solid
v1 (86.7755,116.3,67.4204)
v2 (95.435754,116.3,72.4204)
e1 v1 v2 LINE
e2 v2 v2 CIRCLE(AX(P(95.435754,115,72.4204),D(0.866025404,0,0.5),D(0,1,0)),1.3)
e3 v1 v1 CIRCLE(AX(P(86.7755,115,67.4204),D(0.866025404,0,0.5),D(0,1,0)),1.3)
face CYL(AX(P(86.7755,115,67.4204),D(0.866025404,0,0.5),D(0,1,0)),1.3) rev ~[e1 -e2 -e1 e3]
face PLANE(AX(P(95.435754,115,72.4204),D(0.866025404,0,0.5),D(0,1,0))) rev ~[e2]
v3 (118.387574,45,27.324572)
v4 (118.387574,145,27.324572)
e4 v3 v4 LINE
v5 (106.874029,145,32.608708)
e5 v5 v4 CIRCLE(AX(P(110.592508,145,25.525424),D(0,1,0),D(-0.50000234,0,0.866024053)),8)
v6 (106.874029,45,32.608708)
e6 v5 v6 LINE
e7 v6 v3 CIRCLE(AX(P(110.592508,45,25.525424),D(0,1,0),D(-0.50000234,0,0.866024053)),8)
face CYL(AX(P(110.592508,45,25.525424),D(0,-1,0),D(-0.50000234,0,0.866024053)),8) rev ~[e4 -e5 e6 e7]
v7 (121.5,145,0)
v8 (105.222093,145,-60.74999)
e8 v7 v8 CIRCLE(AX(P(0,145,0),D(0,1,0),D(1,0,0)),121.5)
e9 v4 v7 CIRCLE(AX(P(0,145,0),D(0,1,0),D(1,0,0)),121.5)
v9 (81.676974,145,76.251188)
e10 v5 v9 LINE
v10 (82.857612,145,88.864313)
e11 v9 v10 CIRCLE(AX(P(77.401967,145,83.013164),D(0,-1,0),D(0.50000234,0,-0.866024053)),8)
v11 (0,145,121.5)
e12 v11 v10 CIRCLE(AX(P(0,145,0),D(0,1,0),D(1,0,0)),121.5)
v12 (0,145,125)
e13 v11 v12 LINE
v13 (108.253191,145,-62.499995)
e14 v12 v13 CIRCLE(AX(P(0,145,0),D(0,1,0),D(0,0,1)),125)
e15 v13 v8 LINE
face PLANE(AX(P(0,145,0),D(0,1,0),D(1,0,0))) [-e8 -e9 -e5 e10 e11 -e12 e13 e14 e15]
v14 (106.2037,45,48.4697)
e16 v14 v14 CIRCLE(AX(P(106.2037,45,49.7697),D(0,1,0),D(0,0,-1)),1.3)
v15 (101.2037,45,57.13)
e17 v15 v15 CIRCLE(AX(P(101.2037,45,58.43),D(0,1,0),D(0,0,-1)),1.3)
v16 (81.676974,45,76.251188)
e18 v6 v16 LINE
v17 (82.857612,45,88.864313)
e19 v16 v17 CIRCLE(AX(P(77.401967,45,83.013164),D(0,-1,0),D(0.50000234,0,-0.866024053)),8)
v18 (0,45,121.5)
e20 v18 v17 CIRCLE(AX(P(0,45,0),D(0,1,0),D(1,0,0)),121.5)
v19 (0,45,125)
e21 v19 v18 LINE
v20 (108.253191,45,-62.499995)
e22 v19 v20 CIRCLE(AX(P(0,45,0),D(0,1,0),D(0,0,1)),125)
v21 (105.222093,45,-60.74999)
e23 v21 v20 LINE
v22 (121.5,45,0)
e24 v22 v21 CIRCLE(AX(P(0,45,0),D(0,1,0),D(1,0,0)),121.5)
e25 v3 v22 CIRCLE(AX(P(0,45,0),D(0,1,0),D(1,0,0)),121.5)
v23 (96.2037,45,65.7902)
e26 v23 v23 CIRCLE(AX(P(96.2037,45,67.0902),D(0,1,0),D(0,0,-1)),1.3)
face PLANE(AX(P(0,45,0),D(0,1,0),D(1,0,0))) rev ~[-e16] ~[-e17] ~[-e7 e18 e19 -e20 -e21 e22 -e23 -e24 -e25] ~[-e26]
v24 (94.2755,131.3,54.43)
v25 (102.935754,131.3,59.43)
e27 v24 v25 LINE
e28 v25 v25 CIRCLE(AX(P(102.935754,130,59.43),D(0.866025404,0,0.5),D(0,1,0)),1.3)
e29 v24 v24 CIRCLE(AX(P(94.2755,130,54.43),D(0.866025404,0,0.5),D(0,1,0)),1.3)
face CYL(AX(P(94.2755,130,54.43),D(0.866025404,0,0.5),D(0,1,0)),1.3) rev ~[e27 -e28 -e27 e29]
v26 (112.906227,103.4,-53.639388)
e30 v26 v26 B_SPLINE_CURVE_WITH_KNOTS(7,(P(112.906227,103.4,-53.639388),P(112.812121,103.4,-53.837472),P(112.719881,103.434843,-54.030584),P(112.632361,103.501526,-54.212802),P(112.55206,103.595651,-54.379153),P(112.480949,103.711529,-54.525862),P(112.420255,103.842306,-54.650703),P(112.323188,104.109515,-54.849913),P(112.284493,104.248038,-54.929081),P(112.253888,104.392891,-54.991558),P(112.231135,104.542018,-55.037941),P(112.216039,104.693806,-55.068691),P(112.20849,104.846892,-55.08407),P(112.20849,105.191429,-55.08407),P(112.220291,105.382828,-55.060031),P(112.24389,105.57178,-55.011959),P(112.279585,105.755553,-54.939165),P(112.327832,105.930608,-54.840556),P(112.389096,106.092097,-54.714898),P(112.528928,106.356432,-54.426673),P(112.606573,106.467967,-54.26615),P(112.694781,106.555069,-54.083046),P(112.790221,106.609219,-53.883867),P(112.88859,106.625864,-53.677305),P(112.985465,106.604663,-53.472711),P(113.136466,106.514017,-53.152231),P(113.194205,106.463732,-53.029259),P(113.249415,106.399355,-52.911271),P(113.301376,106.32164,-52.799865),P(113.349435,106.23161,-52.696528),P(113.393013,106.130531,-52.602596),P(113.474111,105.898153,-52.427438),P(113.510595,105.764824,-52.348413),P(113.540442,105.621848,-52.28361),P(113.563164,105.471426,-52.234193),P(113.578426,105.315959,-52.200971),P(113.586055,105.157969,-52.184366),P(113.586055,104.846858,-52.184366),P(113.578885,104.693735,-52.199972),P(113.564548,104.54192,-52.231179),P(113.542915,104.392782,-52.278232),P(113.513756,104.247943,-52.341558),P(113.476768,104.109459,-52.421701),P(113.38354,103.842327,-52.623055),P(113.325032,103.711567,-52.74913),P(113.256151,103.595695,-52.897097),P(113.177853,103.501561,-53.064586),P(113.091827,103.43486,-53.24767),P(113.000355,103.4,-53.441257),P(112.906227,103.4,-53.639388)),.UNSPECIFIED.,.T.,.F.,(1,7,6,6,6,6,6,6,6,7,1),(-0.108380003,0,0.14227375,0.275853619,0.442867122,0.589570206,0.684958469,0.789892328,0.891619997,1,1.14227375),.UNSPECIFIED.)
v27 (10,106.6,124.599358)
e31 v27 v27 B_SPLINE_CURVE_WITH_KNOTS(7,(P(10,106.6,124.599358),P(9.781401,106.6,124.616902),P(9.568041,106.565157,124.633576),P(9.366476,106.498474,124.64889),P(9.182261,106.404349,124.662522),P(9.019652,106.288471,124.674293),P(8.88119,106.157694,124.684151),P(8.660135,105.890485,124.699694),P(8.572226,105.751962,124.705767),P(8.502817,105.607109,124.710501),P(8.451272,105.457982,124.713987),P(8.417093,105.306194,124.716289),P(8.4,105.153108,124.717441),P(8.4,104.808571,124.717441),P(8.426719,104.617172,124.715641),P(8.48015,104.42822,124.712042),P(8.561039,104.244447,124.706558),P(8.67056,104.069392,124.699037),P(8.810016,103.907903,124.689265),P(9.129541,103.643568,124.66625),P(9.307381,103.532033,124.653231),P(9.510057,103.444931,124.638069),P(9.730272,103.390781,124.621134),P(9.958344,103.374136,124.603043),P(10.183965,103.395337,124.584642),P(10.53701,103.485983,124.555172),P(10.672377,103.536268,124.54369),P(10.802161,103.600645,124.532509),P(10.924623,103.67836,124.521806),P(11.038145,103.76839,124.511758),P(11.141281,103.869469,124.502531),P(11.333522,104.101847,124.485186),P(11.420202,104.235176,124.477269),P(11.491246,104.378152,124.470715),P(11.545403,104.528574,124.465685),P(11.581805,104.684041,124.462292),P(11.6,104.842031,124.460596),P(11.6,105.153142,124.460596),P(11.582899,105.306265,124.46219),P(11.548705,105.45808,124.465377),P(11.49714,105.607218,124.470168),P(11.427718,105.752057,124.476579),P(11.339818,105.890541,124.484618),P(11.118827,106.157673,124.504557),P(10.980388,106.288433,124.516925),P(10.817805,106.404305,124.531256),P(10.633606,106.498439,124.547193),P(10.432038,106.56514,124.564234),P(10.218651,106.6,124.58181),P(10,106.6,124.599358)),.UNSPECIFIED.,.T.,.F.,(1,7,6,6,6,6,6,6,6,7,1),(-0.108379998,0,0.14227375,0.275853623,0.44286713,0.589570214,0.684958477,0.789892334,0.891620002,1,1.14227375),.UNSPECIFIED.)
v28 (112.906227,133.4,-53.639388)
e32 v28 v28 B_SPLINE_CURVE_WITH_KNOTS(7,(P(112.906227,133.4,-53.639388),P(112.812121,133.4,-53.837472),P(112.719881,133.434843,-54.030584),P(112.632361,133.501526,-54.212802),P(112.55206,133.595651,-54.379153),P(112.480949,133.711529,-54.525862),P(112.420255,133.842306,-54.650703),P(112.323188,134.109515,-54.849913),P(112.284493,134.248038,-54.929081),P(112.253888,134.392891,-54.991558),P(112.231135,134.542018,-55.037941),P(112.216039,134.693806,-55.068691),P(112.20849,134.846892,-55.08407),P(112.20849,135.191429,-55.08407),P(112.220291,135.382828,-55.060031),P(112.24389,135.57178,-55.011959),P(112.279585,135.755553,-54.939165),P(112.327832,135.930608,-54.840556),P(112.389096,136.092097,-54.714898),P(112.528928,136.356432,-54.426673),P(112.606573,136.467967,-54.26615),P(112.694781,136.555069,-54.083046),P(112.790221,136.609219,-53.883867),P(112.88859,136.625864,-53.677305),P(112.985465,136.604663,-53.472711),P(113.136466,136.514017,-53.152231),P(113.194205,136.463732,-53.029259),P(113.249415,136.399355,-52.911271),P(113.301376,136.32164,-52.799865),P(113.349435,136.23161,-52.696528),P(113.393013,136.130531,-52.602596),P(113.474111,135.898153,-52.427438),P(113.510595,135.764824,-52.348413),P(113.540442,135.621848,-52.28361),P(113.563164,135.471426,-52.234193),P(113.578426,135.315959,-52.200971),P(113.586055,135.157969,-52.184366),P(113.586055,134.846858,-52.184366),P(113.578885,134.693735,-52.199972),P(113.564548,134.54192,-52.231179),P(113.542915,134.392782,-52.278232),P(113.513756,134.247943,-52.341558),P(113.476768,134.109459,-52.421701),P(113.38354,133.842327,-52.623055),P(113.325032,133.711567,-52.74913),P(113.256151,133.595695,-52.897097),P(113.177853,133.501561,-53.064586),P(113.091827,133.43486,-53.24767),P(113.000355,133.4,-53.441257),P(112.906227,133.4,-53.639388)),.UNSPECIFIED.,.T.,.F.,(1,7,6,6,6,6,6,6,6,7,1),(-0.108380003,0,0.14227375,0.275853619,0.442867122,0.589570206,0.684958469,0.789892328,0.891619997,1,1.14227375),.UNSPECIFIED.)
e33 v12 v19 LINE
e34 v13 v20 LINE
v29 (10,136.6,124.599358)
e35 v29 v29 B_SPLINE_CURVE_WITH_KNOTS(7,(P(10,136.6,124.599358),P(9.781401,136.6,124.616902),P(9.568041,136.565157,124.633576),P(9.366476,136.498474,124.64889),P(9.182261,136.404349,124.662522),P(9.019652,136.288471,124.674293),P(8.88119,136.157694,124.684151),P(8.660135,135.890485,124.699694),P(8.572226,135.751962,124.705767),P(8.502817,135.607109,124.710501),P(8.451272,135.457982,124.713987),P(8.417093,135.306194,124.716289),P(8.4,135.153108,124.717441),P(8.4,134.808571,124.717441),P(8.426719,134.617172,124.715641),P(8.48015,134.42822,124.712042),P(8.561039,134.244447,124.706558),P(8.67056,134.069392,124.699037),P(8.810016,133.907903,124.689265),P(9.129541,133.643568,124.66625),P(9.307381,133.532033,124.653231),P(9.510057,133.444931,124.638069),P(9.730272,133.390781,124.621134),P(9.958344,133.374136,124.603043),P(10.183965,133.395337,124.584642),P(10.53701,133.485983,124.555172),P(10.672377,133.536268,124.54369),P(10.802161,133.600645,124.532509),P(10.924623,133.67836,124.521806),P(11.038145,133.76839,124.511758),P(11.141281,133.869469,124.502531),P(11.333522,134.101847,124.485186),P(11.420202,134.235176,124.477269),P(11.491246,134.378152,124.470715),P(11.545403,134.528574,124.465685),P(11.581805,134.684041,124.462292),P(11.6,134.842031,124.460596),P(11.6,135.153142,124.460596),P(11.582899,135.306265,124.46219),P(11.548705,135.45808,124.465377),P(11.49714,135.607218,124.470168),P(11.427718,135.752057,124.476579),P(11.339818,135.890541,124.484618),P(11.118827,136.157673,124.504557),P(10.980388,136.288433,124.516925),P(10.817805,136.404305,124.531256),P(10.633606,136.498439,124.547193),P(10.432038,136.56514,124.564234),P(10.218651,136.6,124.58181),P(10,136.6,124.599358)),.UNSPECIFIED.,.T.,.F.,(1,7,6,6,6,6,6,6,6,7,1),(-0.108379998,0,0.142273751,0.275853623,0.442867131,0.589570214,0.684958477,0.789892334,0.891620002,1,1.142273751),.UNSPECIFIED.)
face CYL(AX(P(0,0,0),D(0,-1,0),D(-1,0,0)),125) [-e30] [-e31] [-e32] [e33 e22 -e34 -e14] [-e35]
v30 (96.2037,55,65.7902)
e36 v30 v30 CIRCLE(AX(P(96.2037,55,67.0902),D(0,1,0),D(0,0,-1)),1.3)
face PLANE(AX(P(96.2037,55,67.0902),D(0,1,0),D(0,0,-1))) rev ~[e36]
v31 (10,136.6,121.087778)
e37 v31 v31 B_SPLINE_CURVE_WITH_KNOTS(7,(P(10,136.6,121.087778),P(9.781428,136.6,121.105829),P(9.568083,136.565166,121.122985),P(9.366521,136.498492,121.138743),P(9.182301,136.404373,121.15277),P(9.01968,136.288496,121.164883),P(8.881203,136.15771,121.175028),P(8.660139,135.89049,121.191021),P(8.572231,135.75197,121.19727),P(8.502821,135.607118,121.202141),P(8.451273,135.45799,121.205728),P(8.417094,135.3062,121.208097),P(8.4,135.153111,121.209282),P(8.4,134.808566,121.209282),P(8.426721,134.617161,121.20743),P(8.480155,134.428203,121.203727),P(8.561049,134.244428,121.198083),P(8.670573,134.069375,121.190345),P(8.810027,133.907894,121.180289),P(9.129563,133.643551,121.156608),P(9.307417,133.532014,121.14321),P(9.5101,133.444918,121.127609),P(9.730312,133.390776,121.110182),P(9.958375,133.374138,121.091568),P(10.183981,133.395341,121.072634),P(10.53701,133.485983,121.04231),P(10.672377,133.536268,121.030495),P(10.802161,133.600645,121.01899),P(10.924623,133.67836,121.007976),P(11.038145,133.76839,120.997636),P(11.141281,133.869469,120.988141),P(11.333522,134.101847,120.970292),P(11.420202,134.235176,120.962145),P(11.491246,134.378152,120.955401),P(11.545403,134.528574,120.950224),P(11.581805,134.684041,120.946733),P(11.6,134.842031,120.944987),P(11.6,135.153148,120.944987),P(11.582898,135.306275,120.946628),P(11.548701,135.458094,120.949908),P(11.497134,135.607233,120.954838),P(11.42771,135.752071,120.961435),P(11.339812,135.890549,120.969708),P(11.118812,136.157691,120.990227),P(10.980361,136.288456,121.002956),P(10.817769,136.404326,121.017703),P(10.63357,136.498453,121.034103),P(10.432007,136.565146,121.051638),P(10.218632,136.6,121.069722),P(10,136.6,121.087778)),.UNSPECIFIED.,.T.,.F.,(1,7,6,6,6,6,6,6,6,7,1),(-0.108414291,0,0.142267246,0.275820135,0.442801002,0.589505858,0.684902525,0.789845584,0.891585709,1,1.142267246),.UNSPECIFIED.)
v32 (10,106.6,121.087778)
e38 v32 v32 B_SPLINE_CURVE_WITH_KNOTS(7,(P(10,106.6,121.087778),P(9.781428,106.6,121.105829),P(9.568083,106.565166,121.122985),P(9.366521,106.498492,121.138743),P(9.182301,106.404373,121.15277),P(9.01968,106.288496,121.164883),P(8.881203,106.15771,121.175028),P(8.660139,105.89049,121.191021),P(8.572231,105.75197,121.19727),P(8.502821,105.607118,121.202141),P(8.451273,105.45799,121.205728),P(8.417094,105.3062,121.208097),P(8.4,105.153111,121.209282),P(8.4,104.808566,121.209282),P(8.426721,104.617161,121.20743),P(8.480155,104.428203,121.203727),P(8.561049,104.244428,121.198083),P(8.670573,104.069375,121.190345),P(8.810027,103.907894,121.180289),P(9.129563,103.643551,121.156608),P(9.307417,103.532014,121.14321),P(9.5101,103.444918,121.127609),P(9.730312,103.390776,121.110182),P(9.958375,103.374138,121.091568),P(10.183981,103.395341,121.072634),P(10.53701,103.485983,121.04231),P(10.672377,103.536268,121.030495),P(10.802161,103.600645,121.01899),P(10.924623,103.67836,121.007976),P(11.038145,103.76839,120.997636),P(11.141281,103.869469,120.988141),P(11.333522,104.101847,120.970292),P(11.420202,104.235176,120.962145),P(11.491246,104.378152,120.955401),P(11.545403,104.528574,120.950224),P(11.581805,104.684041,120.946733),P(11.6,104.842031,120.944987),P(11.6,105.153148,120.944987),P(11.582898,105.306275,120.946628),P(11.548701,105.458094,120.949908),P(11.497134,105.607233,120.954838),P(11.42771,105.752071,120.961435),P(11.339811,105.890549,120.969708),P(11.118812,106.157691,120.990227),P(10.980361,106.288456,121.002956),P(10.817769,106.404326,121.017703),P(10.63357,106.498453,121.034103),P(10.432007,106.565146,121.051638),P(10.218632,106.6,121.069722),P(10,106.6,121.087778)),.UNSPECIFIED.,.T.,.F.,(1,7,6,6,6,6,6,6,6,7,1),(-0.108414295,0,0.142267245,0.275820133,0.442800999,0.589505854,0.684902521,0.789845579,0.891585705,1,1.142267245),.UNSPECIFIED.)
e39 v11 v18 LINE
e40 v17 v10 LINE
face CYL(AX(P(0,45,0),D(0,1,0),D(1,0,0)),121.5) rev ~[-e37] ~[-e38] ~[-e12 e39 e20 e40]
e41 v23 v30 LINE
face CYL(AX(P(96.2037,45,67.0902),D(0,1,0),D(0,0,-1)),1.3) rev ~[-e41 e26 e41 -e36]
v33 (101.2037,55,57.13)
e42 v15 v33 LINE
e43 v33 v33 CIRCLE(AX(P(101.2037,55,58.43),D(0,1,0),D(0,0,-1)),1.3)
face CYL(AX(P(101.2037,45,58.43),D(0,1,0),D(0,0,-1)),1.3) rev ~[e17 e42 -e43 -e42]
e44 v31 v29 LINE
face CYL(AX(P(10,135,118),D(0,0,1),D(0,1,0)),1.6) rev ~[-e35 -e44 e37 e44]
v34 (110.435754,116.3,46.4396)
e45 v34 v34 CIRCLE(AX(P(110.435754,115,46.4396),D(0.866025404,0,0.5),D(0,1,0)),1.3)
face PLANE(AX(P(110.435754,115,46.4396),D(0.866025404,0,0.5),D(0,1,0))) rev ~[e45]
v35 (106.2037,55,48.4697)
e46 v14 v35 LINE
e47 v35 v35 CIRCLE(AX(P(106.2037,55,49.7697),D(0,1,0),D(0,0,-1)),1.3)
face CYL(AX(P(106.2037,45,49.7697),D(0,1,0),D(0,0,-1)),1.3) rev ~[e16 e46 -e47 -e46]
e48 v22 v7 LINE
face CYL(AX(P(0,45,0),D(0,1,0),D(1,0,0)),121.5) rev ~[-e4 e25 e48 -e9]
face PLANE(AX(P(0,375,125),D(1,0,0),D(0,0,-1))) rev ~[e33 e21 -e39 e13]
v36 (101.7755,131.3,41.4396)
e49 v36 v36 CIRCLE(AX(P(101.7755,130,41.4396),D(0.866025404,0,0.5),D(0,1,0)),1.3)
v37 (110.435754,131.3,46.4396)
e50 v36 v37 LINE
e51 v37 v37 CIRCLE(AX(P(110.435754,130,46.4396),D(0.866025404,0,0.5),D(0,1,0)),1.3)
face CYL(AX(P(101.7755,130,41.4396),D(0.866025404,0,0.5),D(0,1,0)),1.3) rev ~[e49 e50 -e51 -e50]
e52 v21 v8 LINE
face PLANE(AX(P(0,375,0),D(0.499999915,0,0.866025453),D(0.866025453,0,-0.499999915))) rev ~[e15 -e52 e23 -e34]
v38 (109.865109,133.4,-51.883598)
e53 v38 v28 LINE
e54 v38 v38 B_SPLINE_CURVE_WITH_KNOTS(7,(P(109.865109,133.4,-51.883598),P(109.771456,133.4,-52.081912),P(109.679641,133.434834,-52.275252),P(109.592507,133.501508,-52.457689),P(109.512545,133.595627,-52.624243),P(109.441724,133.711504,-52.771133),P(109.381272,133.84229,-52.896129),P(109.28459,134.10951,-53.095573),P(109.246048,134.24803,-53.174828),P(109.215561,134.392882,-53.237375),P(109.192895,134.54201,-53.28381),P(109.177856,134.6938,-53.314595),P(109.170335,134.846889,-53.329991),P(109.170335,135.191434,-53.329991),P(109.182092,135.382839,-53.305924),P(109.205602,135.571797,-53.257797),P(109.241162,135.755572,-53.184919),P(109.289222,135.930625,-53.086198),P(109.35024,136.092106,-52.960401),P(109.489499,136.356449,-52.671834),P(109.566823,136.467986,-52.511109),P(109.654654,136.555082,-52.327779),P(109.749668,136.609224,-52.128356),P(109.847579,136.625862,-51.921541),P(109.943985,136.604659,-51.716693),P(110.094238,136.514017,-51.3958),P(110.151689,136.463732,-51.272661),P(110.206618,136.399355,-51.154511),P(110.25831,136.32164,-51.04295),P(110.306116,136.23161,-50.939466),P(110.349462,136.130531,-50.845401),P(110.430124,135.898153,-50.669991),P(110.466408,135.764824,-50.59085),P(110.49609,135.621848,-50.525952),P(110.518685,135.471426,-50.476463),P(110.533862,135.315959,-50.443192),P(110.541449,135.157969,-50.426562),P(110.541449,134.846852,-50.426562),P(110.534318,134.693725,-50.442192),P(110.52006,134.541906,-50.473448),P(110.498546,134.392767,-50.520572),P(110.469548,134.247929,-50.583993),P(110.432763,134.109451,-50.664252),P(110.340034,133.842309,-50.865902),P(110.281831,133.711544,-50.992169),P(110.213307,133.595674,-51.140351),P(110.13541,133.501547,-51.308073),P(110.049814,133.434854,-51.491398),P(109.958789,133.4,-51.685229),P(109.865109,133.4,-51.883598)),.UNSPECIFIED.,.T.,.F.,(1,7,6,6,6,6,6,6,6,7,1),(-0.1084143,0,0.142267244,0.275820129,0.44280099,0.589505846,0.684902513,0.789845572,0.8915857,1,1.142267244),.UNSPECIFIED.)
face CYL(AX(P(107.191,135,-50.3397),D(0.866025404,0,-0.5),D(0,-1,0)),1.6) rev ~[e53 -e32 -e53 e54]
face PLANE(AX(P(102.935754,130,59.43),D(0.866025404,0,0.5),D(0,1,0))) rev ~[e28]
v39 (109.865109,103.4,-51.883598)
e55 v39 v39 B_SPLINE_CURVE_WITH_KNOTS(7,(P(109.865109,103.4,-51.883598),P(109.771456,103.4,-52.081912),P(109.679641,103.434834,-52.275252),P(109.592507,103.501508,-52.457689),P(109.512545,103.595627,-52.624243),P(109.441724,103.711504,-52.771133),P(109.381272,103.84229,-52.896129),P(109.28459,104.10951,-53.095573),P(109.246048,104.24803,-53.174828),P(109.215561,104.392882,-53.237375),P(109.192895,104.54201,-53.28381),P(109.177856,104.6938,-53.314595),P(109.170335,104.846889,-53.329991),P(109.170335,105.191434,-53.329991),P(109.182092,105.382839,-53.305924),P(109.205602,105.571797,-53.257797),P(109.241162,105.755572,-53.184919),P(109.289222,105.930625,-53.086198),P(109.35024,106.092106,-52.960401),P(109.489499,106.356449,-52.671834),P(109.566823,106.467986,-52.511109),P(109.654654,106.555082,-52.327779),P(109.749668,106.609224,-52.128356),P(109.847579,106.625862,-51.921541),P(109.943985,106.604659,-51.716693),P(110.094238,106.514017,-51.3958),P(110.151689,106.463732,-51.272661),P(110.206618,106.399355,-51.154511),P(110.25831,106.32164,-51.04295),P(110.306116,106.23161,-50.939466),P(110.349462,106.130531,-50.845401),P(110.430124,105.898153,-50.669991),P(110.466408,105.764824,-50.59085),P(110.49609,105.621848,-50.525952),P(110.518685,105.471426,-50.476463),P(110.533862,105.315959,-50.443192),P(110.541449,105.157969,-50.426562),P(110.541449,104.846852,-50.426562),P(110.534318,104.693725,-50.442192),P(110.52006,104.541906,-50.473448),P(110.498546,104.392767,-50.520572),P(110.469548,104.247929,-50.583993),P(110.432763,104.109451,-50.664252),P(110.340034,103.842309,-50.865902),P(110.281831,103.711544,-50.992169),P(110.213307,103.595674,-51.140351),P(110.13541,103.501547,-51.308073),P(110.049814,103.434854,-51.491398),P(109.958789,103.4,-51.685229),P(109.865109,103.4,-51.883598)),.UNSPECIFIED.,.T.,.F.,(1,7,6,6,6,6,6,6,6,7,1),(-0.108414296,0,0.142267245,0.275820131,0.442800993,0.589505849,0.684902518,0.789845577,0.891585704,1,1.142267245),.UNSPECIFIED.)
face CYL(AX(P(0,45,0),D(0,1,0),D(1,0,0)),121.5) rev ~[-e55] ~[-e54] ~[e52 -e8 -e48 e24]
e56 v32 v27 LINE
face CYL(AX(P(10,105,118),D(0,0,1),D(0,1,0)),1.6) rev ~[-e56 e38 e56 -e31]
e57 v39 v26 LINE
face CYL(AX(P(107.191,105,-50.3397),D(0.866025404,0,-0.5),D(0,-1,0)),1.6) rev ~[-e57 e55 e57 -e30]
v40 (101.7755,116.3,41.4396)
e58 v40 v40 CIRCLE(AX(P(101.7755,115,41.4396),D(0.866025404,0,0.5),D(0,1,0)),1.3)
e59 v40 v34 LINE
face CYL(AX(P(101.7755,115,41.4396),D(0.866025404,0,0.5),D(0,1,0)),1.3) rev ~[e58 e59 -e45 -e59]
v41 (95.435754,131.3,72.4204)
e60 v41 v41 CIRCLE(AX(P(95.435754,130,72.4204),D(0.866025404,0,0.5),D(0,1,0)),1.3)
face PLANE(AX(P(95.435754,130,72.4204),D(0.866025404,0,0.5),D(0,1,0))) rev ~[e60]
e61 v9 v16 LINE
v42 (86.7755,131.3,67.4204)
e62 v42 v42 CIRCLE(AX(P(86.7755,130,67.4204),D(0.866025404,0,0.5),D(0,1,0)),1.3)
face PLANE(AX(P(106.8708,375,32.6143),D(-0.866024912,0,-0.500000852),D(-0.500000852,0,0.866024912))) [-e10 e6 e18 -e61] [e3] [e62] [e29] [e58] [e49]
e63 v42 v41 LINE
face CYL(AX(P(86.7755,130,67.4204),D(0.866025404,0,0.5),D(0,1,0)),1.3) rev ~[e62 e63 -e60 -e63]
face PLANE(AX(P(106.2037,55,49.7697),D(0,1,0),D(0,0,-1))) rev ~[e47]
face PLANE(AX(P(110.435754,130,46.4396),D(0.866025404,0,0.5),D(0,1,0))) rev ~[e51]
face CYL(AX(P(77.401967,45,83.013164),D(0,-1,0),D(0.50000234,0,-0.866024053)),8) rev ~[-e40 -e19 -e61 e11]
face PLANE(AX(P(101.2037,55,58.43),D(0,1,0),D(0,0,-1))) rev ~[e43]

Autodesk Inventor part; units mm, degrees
ref_plane "YZ Plane" through (0, 0, 0) normal (1, 0, 0) x (0, 1, 0)
ref_plane "XZ Plane" through (0, 0, 0) normal (0, 1, 0) x (-1, 0, 0)
ref_plane "XY Plane" through (0, 0, 0) normal (0, 0, 1) x (1, 0, 0)
sketch "スケッチ1" plane through (0, 0, 0) normal (0, 1, 0) x (-1, 0, 0)
  circle A0 centre (0, 0) radius 125
  dimension "d0" = 250
extrude "押し出し1" add sketch "スケッチ1" along normal blind 375
sketch "スケッチ2" plane through (0, 0, 0) normal (0, -1, 0) x (1, 0, 0)
  circle A0 centre (0, 0) radius 125
extrude "押し出し2" cut sketch "スケッチ2" against normal blind 40
sketch "スケッチ3" plane through (0, 40, 0) normal (0, -1, 0) x (1, 0, 0)
  circle A0 centre (0, 0) radius 125 projected
  point P0 (0, 100)
  point P1 (-86.6025, -50)
  point P2 (86.6025, -50)
  dimension "d5" = 100
  dimension "d8" = 360
hole "穴1" at (0, 40, 100) at (-86.6025, 40, -50) at (86.6025, 40, -50) direction (0, 1, 0) diameter 3.2 depth 8
sketch "スケッチ4" plane through (0, 40, 0) normal (0, -1, 0) x (1, 0, 0)
  circle A0 centre (0, 100) radius 1.6 projected
  point P0 (0, 0)
  point P1 (0, 110)
  point P2 (-95.2628, -55)
  point P3 (95.2628, -55)
  dimension "d17" = 10
  dimension "d20" = 360
hole "穴2" at (0, 40, 110) at (-95.2628, 40, -55) at (95.2628, 40, -55) direction (0, 1, 0) diameter 3.2 depth 8
sketch "スケッチ5" plane through (0, 375, 0) normal (0, 1, 0) x (1, 0, 0)
  circle A0 centre (0, 0) radius 120
  dimension "d29" = 240
extrude "押し出し3" cut sketch "スケッチ5" against normal blind 330
sketch "スケッチ6" plane through (0, 45, 0) normal (0, 1, 0) x (1, 0, 0)
  circle A0 centre (0, 0) radius 120 projected
  line L0 (0, -118) -> (-21.8174, -118)
  line L1 (0, -118) -> (21.8174, -118)
  arc A1 (21.8174, -118) -> (-21.8174, -118) centre (0, 0) ccw
  arc A2 (-21.8174, -118) -> (21.8174, -118) centre (0, 0) ccw
  arc A3 (113.0997, 40.1056) -> (91.2823, 77.8944) centre (0, 0) ccw
  line L2 (102.191, 59) -> (91.2823, 77.8944)
  line L3 (102.191, 59) -> (113.0997, 40.1056)
  arc A4 (-91.2823, 77.8944) -> (-113.0997, 40.1056) centre (0, 0) ccw
  line L4 (-102.191, 59) -> (-113.0997, 40.1056)
  line L5 (-102.191, 59) -> (-91.2823, 77.8944)
  point P0 (-91.2823, 77.8944)
  point P1 (-113.0997, 40.1056)
  point P2 (113.0997, 40.1056)
  point P3 (91.2823, 77.8944)
  dimension "d32" = 118
  dimension "d35" = 360
extrude "押し出し4" add sketch "スケッチ6" along normal blind 330 contours L3 L2 A0 | A0 L0 L1 | L5 L4 A0
sketch "スケッチ8" plane through (21.8174, 45, 118) normal (0, 0, -1) x (-1, 0, 0)
  line L0 (43.6348, 0) -> (0, 0) projected
  point P0 (21.8174, -45)
  point P1 (11.8174, 60)
  point P2 (31.8174, 60)
  point P3 (11.8174, 90)
  point P4 (31.8174, 90)
  dimension "d52" = 30
  dimension "d90" = 60
  dimension "d91" = 60
  dimension "d92" = 30
hole "穴4" at (10, 105, 118) at (-10, 105, 118) at (10, 135, 118) at (-10, 135, 118) direction (0, 0, 1) diameter 3.2 depth 8
sketch "スケッチ11" plane through (113.0997, 45, -40.1056) normal (-0.8660254, 0, 0.5) x (0.5, 0, 0.8660254)
  line L0 (0, 0) -> (-43.6348, 0) projected
  point P0 (-21.8174, -45)
  point P1 (-31.8174, 60)
  point P2 (-31.8174, 90)
  point P3 (-11.8174, 60)
  point P4 (-11.8174, 90)
  dimension "d65" = 30
  dimension "d95" = 60
  dimension "d96" = 60
  dimension "d98" = 30
hole "穴5" at (97.191, 105, -67.6603) at (97.191, 135, -67.6603) at (107.191, 135, -50.3397) at (107.191, 105, -50.3397) direction (0.8660254, 0, -0.5) diameter 3.2 depth 8
sketch "スケッチ12" plane through (0, 375, 0) normal (0, 1, 0) x (1, 0, 0)
  circle A0 centre (0, 0) radius 121.5
  dimension "d73" = 243
extrude "押し出し6" cut sketch "スケッチ12" against normal blind 330
sketch "スケッチ13" plane through (0, 375, 0) normal (0, 1, 0) x (1, 0, 0)
  circle A0 centre (0, 0) radius 125 projected
  line L0 (0, -125) -> (0, 0)
  line L1 (0, 0) -> (108.2532, 62.5)
  arc A1 (0, -125) -> (108.2532, 62.5) centre (0, 0) ccw
  circle A2 centre (0, 0) radius 125
  dimension "d76" = 125
  dimension "d77" = 120
extrude "押し出し7" cut sketch "スケッチ13" against normal blind 400 contours L1 L0 A0 picked at (69.3351, 45.9431)
sketch "スケッチ14" plane through (0, 45, 0) normal (0, 1, 0) x (1, 0, 0)
  line L0 (0, 0) -> (85.2169, 49.2) projected
  line L1 (0, -111.6) -> (0, -121.5) projected
  circle A0 centre (0, 0) radius 121.5
extrude "押し出し8" cut sketch "スケッチ14" against normal blind 400
sketch "スケッチ15" plane through (0, 40, 0) normal (0, -1, 0) x (1, 0, 0)
  line L0 (0, 0) -> (105.2221, 60.75)
  arc A0 (105.2221, -60.75) -> (0, 121.5) centre (0, 0) ccw projected
  line L1 (0, 0) -> (121.5, 0) construction
  line L2 (102.9357, 59.43) -> (115.531, 37.6143)
  line L3 (102.9357, 59.43) -> (90.3404, 81.2456)
  dimension "d82" = 30
extrude "押し出し9" add sketch "スケッチ15" against normal blind 335
sketch "スケッチ17" plane through (0, 40, 0) normal (0, -1, 0) x (1, 0, 0)
  circle A0 centre (0, 0) radius 125
extrude "押し出し11" cut sketch "スケッチ17" against normal blind 5
sketch "スケッチ19" plane through (0, 375, 0) normal (0, 1, 0) x (1, 0, 0)
  arc A0 (115.531, -37.6143) -> (105.2221, 60.75) centre (0, 0) ccw projected
  line L0 (115.531, -37.6143) -> (90.3404, -81.2456) projected
  line L1 (115.531, -37.6143) -> (90.3404, -81.2456)
  line L2 (90.3404, -81.2456) -> (81.6802, -76.2456)
  line L3 (115.531, -37.6143) -> (106.8708, -32.6143)
  line L4 (106.8708, -32.6143) -> (81.6802, -76.2456)
  dimension "d104" = 10
extrude "押し出し13" add sketch "スケッチ19" against normal blind 330
sketch "スケッチ21" plane through (0, 375, 0) normal (0, 1, 0) x (1, 0, 0)
  circle A0 centre (0, 0) radius 125
extrude "押し出し15" cut sketch "スケッチ21" against normal blind 230
fillet "フィレット1" radius 8 2 edges at (115.531, 95, 37.6143) (90.3404, 95, 81.2456)
sketch "スケッチ22" plane through (106.8708, 45, 32.6143) normal (-0.8660254, 0, -0.5) x (-0.5, 0, 0.8660254)
  line L0 (50.3812, 100) -> (0, 100) projected
  line L1 (25.1906, 85) -> (25.1906, 80.9836)
  point P0 (25.1906, -45)
  point P1 (10.1906, 85)
  point P2 (10.1906, 70)
  point P3 (40.1906, 85)
  point P4 (40.1906, 70)
  dimension "d112" = 15
  dimension "d113" = 15
  dimension "d114" = 15
hole "穴6" at (94.2755, 130, 54.43) at (101.7755, 130, 41.4396) at (101.7755, 115, 41.4396) at (86.7755, 130, 67.4204) at (86.7755, 115, 67.4204) direction (0.8660254, 0, 0.5) diameter 2.6 depth 10
sketch "スケッチ23" plane through (0, 45, 0) normal (0, -1, 0) x (1, 0, 0)
  line L0 (81.6802, 76.2456) -> (106.8708, 32.6143) projected
  arc A0 (118.386, 27.3315) -> (106.8708, 32.6143) centre (110.591, 25.5319) ccw projected
  line L1 (106.8708, 32.6143) -> (94.2755, 54.4299)
  line L2 (102.2857, 60.5558) -> (93.6255, 55.5558) projected
  line L3 (94.2755, 54.43) -> (101.2037, 58.43)
  line L4 (103.5857, 58.3041) -> (94.9255, 53.3041) projected
  line L5 (94.2755, 54.43) -> (102.2755, 54.43) construction
  point P0 (0, 0)
  dimension "d124" = 25.1905
  dimension "d126" = 8
  dimension "d127" = 30
hole "穴7" at (101.2037, 45, 58.43) direction (0, 1, 0) diameter 2.6 depth 10
sketch "スケッチ24" plane through (0, 45, 0) normal (0, -1, 0) x (1, 0, 0)
  circle A0 centre (101.2037, 58.43) radius 1.3 projected
  line L0 (101.2037, 58.43) -> (96.2037, 67.0902)
  line L1 (94.7857, 73.5462) -> (86.1255, 68.5462) projected
  line L2 (101.2037, 58.43) -> (111.2037, 58.43) construction
  line L3 (96.2037, 67.0902) -> (106.2037, 49.7697)
  point P0 (0, 0)
  dimension "d135" = 10
  dimension "d136" = 120
  dimension "d137" = 20
hole "穴8" at (96.2037, 45, 67.0902) at (106.2037, 45, 49.7697) direction (0, 1, 0) diameter 2.6 depth 10
properties part number "newbody5"
